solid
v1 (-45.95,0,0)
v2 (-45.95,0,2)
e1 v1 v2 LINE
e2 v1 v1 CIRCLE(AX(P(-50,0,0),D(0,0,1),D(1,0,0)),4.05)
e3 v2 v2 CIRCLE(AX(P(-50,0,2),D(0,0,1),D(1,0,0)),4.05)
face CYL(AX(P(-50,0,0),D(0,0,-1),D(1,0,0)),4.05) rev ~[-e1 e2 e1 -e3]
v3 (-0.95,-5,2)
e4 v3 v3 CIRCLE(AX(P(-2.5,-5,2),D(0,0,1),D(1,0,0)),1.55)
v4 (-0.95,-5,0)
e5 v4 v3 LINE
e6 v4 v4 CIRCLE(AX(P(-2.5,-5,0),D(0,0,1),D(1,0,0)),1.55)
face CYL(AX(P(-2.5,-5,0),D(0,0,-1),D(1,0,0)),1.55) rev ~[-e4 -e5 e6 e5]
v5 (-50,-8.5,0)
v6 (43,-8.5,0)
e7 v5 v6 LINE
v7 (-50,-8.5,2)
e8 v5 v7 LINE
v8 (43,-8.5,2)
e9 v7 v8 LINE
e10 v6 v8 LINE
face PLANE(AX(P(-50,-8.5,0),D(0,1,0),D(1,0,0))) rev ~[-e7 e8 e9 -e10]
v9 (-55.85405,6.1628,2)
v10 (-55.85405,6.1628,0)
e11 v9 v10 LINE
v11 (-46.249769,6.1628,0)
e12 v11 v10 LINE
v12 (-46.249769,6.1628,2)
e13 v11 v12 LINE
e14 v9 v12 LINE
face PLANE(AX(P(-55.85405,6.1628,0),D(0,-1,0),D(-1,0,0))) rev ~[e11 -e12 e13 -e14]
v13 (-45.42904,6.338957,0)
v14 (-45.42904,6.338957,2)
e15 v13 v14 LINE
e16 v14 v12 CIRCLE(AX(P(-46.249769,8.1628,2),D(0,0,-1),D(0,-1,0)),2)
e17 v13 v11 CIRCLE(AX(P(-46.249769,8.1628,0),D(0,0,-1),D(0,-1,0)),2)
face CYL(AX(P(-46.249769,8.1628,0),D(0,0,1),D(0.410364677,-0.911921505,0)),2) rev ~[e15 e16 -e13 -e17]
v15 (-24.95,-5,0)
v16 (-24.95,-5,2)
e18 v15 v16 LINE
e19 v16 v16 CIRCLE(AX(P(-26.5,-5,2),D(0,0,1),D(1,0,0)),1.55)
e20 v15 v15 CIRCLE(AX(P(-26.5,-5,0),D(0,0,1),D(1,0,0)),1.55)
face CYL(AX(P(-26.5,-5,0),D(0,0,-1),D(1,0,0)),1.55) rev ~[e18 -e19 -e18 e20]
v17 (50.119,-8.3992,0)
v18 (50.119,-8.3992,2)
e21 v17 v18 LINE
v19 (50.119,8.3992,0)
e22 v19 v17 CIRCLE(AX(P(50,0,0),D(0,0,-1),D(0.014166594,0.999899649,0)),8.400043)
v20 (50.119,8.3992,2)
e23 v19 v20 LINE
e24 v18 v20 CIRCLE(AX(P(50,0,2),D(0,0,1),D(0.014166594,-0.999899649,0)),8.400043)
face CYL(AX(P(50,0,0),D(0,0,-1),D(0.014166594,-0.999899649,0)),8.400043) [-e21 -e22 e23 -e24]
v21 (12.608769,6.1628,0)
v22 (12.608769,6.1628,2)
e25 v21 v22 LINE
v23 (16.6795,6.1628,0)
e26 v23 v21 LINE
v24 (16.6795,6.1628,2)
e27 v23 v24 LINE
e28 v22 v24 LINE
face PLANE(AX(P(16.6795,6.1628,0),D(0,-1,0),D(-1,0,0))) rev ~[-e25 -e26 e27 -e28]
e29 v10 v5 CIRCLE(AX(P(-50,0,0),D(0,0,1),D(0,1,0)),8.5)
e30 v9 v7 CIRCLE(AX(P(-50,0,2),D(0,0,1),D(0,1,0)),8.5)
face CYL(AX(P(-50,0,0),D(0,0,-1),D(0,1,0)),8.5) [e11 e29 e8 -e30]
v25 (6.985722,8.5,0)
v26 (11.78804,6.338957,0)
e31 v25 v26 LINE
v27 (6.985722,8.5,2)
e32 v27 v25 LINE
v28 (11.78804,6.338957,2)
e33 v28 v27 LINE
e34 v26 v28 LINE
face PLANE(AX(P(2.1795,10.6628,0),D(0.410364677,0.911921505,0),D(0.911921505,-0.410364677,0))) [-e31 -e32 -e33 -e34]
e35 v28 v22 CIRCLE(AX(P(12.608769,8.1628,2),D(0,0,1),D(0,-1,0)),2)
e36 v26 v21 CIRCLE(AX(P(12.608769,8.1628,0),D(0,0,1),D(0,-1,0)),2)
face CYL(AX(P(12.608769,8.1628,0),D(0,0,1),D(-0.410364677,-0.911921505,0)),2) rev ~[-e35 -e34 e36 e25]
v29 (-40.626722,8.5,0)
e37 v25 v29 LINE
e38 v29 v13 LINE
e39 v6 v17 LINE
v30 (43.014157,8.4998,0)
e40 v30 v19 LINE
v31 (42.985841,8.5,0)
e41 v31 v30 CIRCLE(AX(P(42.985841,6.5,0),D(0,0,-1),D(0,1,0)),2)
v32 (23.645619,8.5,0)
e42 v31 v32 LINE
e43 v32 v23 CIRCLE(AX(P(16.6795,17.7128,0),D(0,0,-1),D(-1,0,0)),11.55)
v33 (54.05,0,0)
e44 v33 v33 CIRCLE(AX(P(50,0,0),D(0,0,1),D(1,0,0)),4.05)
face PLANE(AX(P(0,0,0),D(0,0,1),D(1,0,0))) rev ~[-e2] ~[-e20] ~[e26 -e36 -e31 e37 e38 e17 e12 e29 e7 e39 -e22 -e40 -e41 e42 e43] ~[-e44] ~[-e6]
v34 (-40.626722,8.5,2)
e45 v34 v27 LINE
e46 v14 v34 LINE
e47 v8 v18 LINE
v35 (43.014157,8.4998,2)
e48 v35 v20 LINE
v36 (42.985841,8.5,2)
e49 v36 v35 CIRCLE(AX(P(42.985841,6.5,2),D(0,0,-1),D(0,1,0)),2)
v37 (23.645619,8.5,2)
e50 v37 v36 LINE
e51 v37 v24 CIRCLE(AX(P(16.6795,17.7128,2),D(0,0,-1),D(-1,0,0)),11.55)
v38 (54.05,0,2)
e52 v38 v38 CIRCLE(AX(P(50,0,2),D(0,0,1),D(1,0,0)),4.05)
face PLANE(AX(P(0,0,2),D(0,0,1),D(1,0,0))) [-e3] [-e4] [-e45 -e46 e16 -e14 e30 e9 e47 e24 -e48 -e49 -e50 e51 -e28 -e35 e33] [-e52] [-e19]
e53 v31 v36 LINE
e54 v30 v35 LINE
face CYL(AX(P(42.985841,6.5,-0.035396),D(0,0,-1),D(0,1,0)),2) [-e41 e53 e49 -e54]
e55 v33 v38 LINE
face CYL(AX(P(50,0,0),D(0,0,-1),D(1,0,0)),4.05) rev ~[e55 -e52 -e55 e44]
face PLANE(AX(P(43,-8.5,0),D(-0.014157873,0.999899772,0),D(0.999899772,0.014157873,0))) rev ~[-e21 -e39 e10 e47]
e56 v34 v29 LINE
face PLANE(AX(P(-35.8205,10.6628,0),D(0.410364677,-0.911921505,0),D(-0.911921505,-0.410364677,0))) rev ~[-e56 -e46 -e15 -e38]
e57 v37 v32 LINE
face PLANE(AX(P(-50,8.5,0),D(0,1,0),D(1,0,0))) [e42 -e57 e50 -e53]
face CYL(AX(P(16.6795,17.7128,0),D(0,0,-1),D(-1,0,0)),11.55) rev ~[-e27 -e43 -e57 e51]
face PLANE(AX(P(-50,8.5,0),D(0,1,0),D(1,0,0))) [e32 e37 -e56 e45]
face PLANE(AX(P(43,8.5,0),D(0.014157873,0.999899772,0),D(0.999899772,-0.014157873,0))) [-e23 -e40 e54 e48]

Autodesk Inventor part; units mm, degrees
ref_plane "YZ Plane" through (0, 0, 0) normal (1, 0, 0) x (0, 1, 0)
ref_plane "XZ Plane" through (0, 0, 0) normal (0, 1, 0) x (-1, 0, 0)
ref_plane "XY Plane" through (0, 0, 0) normal (0, 0, 1) x (1, 0, 0)
sketch "スケッチ1" plane through (0, 0, 0) normal (0, 0, 1) x (1, 0, 0)
  line L0 (-50, 0) -> (50, 0) construction
  circle A0 centre (-50, 0) radius 4.05
  circle A1 centre (50, 0) radius 4.05
  line L1 (-50, 8.5) -> (43, 8.5)
  line L2 (-50, -8.5) -> (43, -8.5)
  arc A2 (-50, 8.5) -> (-50, -8.5) centre (-50, 0) ccw
  line L3 (43, -8.5) -> (50.119, -8.3992)
  line L4 (43, 8.5) -> (50.119, 8.3992)
  arc A3 (50.119, -8.3992) -> (50.119, 8.3992) centre (50, 0) ccw
  line L5 (-29, -7.5) -> (0, -7.5) construction
  line L6 (0, -7.5) -> (0, -2.5) construction
  line L7 (0, -2.5) -> (-29, -2.5) construction
  line L8 (-29, -2.5) -> (-29, -7.5) construction
  line L9 (-29, -5) -> (0, -5) construction
  circle A4 centre (-26.5, -5) radius 1.55
  line L10 (-14.5, -5) -> (-14.5, -2.5) construction
  line L11 (52.3191, 13) -> (22.3191, 13)
  line L12 (22.3191, 13) -> (12.3191, 8.5)
  line L13 (52.3191, 13) -> (57.3191, 4.122)
  circle A5 centre (-2.5, -5) radius 1.55
  point P0 (0, 0)
  point P1 (0, 0)
  point P2 (54.8534, 8.5)
  dimension "d0" = 100
  dimension "d1" = 8.1
  dimension "d2" = 8.5
  dimension "d8" = 8.1
  dimension "d9" = 7
  dimension "d10" = 8.4
  dimension "d12" = 5
  dimension "d13" = 29
  dimension "d15" = 2.5
  dimension "d17" = 13
  dimension "d19" = 10
  dimension "d20" = 30
  dimension "d25" = 50
  dimension "d26" = 5
  dimension "d45" = 1
  dimension "d46" = 3.1
extrude "押し出し1" add sketch "スケッチ1" along normal blind 2 contours L1 L4 A3 L3 L2 A2
fillet "フィレット1" radius 2 1 edges at (43, 8.5, 1)
sketch "スケッチ2" plane through (0, 0, 0) normal (0, 0, -1) x (-1, 0, 0)
  circle A0 centre (-16.6795, 17.7128) radius 11.35 construction
  circle A1 centre (-16.6795, 17.7128) radius 11.55
  line L0 (-16.6795, 6.1628) -> (58.7547, 6.1628)
  line L1 (-16.6795, 17.7128) -> (-34, 27.7128) construction
  circle A2 centre (-50, 0) radius 4.05 projected
  line L2 (-50, 0) -> (-34, 27.7128) construction
  line L3 (50, -8.5) -> (-43, -8.5) projected
  line L4 (-2.1795, 10.6628) -> (35.8205, 10.6628)
  line L5 (35.8205, 10.6628) -> (45.8205, 6.1628)
  line L6 (-2.1795, 10.6628) -> (-12.1795, 6.1628)
  circle A3 centre (50, 0) radius 4.05 projected
  line L7 (58.7547, 6.1628) -> (-13.2236, 28.7337)
  arc A4 (50, -8.5) -> (50, 8.5) centre (50, 0) ccw projected
  point P0 (0, 0)
  dimension "d29" = 22.7
  dimension "d30" = 0.2
  dimension "d31" = 60
  dimension "d32" = 90
  dimension "d33" = 20
  dimension "d34" = 38
  dimension "d35" = 10
  dimension "d36" = 10
  dimension "d37" = 4.5
  dimension "d38" = 32
  dimension "d40" = 4.5
extrude "押し出し2" cut sketch "スケッチ2" against normal through all contours A1 | A1 L7 A4 L0 L5 L4 L6 | L7 L0 A4
fillet "フィレット2" radius 2 2 edges at (12.1795, 6.1628, 1) (-45.8205, 6.1628, 1)
equation "\"d8\" = d1"
equation "\"d19\" = d18"
equation "\"d36\" = d35"
equation "\"d18\" = 10"
properties part number "リンク_メインフレーム_6_1" material "GFRP"
